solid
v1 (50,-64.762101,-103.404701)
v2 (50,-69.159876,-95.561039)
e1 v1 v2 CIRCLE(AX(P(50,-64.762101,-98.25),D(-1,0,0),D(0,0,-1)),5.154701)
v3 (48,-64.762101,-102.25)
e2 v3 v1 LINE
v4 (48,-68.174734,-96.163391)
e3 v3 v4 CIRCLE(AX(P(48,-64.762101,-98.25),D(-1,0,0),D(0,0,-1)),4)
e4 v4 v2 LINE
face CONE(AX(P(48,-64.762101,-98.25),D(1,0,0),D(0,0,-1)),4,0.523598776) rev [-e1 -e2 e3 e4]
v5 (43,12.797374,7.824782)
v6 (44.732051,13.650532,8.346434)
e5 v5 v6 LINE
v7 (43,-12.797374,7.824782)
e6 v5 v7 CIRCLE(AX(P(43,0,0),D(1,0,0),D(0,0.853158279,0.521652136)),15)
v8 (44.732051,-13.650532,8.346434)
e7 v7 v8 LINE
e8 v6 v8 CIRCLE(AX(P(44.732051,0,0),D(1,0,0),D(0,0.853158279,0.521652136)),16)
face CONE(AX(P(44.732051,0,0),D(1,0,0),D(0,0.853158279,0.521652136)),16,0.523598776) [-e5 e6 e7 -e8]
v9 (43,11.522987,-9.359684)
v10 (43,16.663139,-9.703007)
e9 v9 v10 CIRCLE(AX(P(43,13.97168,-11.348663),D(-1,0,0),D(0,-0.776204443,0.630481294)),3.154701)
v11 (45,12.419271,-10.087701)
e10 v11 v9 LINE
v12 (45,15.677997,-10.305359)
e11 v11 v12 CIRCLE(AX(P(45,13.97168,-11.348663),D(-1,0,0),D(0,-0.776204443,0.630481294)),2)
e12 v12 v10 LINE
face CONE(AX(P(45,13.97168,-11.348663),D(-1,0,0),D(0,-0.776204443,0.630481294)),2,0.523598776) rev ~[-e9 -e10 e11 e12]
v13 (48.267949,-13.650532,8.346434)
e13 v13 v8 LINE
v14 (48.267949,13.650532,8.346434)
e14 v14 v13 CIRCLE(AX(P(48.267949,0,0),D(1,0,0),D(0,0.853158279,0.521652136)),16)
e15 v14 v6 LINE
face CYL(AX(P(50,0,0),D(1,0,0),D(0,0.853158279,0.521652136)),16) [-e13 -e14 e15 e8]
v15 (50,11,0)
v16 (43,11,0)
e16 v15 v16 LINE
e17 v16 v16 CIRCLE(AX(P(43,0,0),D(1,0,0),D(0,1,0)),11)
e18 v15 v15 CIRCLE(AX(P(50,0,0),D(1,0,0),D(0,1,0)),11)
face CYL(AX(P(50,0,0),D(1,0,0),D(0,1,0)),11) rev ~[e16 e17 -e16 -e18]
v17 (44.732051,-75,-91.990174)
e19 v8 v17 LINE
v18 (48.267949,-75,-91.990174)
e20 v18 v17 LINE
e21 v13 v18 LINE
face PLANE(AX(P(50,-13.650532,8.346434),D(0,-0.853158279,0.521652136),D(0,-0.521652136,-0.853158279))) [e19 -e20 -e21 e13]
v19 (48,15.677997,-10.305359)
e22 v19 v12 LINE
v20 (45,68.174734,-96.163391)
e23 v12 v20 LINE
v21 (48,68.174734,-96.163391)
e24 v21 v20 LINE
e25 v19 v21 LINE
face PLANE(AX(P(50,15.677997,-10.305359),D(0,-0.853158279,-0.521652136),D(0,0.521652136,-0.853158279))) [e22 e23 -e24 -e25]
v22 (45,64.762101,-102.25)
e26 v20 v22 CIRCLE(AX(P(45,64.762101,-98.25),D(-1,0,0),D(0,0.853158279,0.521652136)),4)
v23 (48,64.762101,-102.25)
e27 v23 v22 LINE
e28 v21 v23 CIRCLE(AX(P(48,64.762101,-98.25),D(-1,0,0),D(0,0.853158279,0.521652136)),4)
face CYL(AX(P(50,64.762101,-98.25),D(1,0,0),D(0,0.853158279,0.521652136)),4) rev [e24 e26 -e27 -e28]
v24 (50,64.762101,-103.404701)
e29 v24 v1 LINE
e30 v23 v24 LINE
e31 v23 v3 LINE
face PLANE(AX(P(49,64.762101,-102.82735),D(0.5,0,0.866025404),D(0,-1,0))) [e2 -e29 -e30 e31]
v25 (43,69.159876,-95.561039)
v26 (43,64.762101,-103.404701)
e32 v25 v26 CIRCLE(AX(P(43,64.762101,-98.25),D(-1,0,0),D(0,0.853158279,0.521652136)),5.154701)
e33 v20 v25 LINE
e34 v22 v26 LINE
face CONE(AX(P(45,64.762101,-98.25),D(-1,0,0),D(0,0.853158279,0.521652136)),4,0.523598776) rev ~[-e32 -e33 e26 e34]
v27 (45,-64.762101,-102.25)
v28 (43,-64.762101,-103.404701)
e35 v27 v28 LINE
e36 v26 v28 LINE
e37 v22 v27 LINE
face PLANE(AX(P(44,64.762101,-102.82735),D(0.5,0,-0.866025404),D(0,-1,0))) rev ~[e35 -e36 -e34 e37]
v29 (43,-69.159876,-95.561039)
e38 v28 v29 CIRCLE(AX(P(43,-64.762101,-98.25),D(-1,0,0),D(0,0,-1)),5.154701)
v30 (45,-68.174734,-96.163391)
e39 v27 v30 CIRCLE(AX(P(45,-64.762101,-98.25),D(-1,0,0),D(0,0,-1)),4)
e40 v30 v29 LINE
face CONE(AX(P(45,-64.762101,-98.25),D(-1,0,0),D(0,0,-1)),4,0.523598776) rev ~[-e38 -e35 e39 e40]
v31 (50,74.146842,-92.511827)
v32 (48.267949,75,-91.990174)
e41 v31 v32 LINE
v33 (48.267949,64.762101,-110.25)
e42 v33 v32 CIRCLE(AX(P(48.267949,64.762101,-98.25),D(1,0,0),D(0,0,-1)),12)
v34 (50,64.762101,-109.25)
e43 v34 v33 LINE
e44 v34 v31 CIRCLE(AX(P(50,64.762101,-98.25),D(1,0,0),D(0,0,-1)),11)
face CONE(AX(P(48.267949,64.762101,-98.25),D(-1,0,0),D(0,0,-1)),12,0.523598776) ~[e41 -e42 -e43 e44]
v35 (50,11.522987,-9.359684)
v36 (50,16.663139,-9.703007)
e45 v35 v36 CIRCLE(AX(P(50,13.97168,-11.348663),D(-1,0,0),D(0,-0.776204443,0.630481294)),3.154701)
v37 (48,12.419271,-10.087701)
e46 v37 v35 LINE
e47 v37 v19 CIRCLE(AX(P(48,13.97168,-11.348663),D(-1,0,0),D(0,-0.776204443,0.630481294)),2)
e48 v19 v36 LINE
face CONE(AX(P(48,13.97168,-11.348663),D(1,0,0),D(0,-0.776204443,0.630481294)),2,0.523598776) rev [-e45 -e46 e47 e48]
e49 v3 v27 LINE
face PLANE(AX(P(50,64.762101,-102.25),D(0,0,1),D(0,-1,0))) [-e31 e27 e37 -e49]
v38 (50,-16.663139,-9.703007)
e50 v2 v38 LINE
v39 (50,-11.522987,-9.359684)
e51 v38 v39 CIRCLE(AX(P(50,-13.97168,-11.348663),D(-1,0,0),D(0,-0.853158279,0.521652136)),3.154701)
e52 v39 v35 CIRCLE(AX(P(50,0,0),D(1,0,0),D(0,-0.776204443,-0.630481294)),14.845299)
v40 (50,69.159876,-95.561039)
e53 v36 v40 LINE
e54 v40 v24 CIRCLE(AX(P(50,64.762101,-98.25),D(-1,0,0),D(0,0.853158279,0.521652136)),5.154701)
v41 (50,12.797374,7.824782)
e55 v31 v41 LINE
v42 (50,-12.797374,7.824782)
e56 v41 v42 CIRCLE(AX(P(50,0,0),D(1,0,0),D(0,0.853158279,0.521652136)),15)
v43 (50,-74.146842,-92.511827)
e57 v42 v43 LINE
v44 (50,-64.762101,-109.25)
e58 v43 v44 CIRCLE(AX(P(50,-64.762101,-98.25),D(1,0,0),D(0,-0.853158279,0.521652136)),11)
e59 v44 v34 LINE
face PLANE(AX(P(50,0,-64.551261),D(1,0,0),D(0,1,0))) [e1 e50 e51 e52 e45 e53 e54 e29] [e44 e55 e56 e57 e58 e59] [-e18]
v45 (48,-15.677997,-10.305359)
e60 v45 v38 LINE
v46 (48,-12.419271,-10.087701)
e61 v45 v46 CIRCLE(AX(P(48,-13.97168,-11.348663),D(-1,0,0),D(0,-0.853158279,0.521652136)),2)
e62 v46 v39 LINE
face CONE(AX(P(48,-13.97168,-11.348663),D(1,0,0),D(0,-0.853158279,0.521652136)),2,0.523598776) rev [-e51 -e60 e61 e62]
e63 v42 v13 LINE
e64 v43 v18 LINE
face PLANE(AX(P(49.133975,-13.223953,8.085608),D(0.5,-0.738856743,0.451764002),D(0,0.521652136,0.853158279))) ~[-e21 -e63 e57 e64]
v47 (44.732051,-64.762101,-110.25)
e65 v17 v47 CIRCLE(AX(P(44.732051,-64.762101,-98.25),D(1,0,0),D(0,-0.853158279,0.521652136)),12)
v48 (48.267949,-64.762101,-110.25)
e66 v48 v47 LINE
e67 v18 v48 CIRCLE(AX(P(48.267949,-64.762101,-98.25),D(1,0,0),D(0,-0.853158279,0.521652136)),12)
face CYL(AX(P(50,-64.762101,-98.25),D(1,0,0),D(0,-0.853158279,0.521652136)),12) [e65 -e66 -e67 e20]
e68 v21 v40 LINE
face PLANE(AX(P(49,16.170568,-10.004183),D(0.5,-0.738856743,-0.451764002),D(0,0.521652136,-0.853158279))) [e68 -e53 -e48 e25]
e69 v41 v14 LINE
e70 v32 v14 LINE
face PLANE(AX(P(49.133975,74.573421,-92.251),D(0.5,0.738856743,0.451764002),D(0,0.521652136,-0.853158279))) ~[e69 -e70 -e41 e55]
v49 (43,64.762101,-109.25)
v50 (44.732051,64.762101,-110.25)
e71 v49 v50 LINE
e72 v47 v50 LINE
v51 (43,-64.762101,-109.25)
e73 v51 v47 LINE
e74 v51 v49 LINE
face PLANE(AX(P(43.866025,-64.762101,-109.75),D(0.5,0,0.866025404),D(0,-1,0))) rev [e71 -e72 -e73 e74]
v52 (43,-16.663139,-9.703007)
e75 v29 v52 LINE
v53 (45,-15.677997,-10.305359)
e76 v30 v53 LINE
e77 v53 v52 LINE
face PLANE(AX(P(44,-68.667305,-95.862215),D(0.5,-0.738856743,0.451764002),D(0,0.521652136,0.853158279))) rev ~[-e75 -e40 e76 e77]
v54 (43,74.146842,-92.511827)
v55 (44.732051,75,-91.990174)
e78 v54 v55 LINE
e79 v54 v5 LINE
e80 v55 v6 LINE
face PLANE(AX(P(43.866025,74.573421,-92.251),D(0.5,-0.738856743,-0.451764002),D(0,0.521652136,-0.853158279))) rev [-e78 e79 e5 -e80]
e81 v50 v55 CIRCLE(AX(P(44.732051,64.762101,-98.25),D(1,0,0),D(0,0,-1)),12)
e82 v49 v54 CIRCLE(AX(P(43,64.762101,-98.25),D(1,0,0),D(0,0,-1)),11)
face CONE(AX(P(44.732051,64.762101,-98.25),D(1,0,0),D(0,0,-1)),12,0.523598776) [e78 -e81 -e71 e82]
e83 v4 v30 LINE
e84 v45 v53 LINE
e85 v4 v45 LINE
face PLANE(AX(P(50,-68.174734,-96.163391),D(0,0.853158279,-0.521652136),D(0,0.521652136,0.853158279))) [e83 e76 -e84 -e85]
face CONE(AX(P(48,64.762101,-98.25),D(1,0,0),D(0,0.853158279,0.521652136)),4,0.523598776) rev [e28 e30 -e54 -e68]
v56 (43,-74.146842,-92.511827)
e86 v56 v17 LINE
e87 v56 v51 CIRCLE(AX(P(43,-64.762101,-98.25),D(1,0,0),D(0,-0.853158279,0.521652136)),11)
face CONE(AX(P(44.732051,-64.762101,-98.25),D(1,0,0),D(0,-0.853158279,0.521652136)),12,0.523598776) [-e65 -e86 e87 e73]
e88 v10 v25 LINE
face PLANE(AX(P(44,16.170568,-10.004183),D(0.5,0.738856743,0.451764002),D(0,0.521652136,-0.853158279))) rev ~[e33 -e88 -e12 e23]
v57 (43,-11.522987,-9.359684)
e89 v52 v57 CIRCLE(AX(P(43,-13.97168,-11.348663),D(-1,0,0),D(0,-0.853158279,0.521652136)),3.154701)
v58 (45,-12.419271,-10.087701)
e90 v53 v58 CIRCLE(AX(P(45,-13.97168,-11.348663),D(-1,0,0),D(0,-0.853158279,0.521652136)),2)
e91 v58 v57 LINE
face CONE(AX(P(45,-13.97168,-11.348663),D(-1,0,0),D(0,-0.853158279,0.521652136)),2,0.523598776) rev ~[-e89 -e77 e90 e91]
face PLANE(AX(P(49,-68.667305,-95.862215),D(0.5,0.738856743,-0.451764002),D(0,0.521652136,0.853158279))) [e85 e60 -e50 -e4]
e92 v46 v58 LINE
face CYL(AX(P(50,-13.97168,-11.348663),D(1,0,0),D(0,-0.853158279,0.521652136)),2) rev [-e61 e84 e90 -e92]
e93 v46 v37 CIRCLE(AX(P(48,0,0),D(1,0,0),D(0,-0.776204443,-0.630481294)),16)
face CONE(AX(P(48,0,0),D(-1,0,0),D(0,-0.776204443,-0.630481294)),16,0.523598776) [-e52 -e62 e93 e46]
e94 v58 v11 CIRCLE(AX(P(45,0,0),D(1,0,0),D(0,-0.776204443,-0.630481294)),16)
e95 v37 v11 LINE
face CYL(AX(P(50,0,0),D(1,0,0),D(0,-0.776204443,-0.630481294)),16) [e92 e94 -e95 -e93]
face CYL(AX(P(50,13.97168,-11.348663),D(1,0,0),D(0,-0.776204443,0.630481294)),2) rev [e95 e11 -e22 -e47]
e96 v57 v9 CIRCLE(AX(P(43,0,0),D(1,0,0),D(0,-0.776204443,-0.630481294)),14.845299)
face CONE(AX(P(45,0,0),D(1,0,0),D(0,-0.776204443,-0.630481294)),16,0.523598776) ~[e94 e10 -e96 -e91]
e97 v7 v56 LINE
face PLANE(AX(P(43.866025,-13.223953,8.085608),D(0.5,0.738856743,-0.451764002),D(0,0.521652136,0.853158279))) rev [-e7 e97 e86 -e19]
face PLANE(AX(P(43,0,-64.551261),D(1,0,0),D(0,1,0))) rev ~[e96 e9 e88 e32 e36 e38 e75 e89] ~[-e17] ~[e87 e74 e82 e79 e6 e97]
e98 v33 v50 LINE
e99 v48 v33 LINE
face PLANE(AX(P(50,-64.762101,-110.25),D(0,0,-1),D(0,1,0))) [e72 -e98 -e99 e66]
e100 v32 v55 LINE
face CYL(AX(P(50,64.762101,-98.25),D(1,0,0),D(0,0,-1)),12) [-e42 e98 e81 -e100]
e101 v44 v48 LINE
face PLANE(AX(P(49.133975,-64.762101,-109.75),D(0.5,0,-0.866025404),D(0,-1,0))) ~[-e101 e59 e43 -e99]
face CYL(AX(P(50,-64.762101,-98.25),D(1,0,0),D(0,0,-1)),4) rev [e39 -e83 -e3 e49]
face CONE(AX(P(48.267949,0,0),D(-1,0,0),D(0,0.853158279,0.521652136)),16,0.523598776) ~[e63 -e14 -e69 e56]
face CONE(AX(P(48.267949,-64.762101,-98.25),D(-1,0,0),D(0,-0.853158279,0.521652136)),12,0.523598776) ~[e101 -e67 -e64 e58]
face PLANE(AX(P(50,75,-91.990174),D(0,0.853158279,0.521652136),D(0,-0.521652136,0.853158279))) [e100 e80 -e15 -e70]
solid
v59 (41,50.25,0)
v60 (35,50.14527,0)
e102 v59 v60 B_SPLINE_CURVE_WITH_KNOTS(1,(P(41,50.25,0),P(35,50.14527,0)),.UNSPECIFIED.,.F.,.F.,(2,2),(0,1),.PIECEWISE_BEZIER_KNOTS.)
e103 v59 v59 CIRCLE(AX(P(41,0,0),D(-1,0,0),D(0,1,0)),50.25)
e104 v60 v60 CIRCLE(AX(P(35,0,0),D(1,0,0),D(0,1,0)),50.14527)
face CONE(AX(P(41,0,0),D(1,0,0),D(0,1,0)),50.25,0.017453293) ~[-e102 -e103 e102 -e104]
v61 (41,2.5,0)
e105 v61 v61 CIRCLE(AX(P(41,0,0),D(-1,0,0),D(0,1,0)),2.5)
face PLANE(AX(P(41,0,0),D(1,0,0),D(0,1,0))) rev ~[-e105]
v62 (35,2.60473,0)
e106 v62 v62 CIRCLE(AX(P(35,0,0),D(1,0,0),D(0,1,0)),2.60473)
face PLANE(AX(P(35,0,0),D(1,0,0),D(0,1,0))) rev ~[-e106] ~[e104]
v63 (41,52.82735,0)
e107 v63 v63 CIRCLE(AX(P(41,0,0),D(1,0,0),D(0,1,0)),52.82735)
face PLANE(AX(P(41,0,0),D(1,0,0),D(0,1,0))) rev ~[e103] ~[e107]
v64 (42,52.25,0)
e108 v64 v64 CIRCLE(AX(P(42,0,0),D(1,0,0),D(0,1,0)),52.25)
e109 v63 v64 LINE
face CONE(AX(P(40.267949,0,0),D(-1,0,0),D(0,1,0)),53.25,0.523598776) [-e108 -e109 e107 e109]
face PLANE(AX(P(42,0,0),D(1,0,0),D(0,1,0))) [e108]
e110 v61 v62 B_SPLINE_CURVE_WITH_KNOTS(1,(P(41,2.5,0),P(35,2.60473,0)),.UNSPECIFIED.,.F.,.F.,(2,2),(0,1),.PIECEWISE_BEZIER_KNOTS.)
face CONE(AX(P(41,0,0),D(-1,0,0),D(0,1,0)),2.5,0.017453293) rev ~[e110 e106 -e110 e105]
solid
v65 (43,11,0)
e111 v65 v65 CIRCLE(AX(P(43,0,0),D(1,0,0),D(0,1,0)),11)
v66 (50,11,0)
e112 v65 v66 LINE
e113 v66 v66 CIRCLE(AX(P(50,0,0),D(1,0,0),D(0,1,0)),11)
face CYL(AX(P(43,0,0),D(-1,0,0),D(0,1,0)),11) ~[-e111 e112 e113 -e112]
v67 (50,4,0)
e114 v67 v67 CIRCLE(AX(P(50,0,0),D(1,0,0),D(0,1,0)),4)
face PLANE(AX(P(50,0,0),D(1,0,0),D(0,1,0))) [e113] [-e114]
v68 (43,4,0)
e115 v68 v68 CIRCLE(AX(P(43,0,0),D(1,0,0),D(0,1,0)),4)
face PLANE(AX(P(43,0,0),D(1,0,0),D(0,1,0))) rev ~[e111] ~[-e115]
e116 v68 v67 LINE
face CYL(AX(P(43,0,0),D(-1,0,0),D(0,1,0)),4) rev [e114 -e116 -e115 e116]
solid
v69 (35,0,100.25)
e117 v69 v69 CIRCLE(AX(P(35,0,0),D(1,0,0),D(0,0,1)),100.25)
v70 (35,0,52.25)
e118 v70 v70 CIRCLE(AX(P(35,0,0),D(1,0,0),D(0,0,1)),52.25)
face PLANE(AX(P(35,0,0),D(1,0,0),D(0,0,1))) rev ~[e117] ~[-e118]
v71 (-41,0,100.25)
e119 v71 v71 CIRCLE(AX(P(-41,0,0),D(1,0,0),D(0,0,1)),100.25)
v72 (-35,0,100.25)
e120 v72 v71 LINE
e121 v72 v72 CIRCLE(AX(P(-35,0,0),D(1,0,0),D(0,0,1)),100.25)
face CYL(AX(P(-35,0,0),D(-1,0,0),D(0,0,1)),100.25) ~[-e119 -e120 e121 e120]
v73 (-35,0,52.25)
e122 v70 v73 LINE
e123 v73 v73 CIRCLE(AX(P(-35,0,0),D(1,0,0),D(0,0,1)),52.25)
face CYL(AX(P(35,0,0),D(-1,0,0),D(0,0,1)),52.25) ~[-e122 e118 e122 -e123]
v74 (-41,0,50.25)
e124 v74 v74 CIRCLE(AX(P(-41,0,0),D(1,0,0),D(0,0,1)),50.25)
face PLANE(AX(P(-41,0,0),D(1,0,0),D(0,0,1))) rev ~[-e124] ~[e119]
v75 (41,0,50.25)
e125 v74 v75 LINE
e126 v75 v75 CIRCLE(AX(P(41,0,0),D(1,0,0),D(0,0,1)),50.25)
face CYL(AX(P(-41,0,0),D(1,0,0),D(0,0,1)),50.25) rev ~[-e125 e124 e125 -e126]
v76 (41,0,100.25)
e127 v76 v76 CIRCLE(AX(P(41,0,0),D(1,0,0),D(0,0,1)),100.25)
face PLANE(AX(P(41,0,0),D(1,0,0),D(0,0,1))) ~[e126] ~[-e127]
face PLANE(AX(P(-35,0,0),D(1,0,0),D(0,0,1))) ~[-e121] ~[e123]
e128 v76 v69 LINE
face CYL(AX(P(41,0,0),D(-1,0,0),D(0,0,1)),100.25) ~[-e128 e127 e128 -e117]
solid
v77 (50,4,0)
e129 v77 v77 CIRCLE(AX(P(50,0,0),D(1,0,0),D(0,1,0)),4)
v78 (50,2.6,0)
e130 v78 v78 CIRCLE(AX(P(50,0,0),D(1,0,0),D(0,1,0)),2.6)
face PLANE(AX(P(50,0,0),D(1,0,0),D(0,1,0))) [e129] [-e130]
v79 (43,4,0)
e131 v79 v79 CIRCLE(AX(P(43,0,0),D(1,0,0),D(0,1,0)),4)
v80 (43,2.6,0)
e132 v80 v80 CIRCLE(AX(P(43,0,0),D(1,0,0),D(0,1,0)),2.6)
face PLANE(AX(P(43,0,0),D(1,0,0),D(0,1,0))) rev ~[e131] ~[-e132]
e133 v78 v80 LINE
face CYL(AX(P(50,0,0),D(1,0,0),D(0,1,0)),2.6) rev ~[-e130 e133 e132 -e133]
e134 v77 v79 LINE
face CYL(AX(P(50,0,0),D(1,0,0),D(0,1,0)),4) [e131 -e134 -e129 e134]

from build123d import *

# Parameters (mm, degrees)
F3_START    = 2
F2_R        = 11
F2_R_2      = 4
F3_DEPTH    = 7
F4_R        = 50.25
F4_R_2      = 2.5
F5_DEPTH    = 6
F5_TAPER    = 1
F6_R        = 53.25
F7_DEPTH    = 1
F8_R        = 4
F8_R_2      = 2.6
F9_DEPTH    = 7
F10_R       = 11
F11_DEPTH   = 7
F13_SIZE2   = 1.1547005384
F13_SIZE    = 2
F14_SIZE2   = 1.7320508076
F14_SIZE    = 1
F14_2_SIZE2 = 1.7320508076
F14_2_SIZE  = 1


# Not quite as in the source:
# - a fillet or chamfer that OpenCascade refuses, or shapes differently, is made with other operations: its cross-section is extruded or revolved along the edge and cut away or added


with BuildPart() as f1:
    # F0 (on Front) → F1 (revolve)
    with BuildSketch(Plane.XZ):
        Polygon((-41, 100.25), (-41, 50.25), (41, 50.25), (41, 100.25), (35, 100.25), (35, 52.25), (-35, 52.25), (-35, 100.25), align=None)
    revolve(axis=Axis((-0.494361277, 0, 0), (1, 0, 0)))


with BuildPart() as f3:
    # F2 (on face) → F3 (new body)
    with BuildSketch(Plane.YZ.offset(41).offset(F3_START)):
        Circle(F2_R)
        Circle(F2_R_2, mode=Mode.SUBTRACT)
    extrude(amount=F3_DEPTH)


with BuildPart() as f5:
    # F4 (on face) → F5 (new body)
    with BuildSketch(Plane.YZ.offset(41)):
        Circle(F4_R)
        Circle(F4_R_2, mode=Mode.SUBTRACT)
    extrude(amount=-F5_DEPTH, taper=F5_TAPER)

    # F6 (on face) → F7 (join)
    with BuildSketch(Plane.YZ.offset(41)):
        Circle(F6_R)
    extrude(amount=F7_DEPTH)

    # F12: chamfer of 1 x 1.7320508076 on 1 edges, made by hand

    # F12_s1 → F12_t2 (revolve, cut)
    with BuildSketch(Plane.XY):
        Polygon((40.2679491924, 53.25), (42, 52.25), (42, 53.25), align=None)
    revolve(axis=Axis((42, 0, 0), (1, 0, 0)), mode=Mode.SUBTRACT)


with BuildPart() as f9:
    # F8 (on face) → F9 (new body, through all)
    with BuildSketch(Plane.YZ.offset(50)):
        Circle(F8_R)
        Circle(F8_R_2, mode=Mode.SUBTRACT)
    extrude(amount=-F9_DEPTH)


with BuildPart() as f11:
    # F10 (on face) → F11 (new body, through all)
    with BuildSketch(Plane.YZ.offset(50)):
        with BuildLine():
            Line((-13.6505324657, 8.3464341728), (-75, -91.9901743704))
            ThreePointArc((-75, -91.9901743704), (-75.2291419603, -104.1186494377), (-64.7621006507, -110.25))
            Line((-64.7621006507, -110.25), (64.7621006507, -110.25))
            ThreePointArc((64.7621006507, -110.25), (75.2291419603, -104.1186494377), (75, -91.9901743704))
            Line((75, -91.9901743704), (13.6505324657, 8.3464341728))
            ThreePointArc((13.6505324657, 8.3464341728), (0, 16), (-13.6505324657, 8.3464341728))
        make_face()
        with BuildLine():
            ThreePointArc((-64.7621006507, -102.25), (-68.2511144206, -100.2062164792), (-68.1747337671, -96.1633914568))
            Line((-68.1747337671, -96.1633914568), (-15.6779965364, -10.3053590236))
            ThreePointArc((-15.6779965364, -10.3053590236), (-14.1049679318, -9.3531096574), (-12.4192710917, -10.0877007068))
            ThreePointArc((-12.4192710917, -10.0877007068), (0, -16), (12.4192710917, -10.0877007068))
            ThreePointArc((12.4192710917, -10.0877007068), (14.1049679318, -9.3531096574), (15.6779965364, -10.3053590236))
            Line((15.6779965364, -10.3053590236), (68.1747337671, -96.1633914568))
            ThreePointArc((68.1747337671, -96.1633914568), (68.2511144206, -100.2062164792), (64.7621006507, -102.25))
            Line((64.7621006507, -102.25), (-64.7621006507, -102.25))
        make_face(mode=Mode.SUBTRACT)
        Circle(F10_R, mode=Mode.SUBTRACT)
    extrude(amount=-F11_DEPTH)

    # F13
    f13_edges = [f11.edges().sort_by_distance(p)[0] for p in [
        (50, 0, -102.25),
        (43, 0, -102.25),
    ]]
    f13_side = f11.faces().sort_by_distance((46.5, 0, -102.25))[0]
    chamfer(f13_edges, length=F13_SIZE, length2=F13_SIZE2, reference=f13_side)

    # F14
    f14_edges = [f11.edges().sort_by_distance(p)[0] for p in [
        (50, 0, -110.25),
    ]]
    f14_side = f11.faces().sort_by_distance((50, 0, -105.392381))[0]
    chamfer(f14_edges, length=F14_SIZE, length2=F14_SIZE2, reference=f14_side)

    # F14#2
    f14_2_edges = [f11.edges().sort_by_distance(p)[0] for p in [
        (43, 0, -110.25),
    ]]
    f14_2_side = f11.faces().sort_by_distance((43, 0, -105.392381))[0]
    chamfer(f14_2_edges, length=F14_2_SIZE, length2=F14_2_SIZE2, reference=f14_2_side)


solid = Compound([f1.part, f3.part, f5.part, f9.part, f11.part])
